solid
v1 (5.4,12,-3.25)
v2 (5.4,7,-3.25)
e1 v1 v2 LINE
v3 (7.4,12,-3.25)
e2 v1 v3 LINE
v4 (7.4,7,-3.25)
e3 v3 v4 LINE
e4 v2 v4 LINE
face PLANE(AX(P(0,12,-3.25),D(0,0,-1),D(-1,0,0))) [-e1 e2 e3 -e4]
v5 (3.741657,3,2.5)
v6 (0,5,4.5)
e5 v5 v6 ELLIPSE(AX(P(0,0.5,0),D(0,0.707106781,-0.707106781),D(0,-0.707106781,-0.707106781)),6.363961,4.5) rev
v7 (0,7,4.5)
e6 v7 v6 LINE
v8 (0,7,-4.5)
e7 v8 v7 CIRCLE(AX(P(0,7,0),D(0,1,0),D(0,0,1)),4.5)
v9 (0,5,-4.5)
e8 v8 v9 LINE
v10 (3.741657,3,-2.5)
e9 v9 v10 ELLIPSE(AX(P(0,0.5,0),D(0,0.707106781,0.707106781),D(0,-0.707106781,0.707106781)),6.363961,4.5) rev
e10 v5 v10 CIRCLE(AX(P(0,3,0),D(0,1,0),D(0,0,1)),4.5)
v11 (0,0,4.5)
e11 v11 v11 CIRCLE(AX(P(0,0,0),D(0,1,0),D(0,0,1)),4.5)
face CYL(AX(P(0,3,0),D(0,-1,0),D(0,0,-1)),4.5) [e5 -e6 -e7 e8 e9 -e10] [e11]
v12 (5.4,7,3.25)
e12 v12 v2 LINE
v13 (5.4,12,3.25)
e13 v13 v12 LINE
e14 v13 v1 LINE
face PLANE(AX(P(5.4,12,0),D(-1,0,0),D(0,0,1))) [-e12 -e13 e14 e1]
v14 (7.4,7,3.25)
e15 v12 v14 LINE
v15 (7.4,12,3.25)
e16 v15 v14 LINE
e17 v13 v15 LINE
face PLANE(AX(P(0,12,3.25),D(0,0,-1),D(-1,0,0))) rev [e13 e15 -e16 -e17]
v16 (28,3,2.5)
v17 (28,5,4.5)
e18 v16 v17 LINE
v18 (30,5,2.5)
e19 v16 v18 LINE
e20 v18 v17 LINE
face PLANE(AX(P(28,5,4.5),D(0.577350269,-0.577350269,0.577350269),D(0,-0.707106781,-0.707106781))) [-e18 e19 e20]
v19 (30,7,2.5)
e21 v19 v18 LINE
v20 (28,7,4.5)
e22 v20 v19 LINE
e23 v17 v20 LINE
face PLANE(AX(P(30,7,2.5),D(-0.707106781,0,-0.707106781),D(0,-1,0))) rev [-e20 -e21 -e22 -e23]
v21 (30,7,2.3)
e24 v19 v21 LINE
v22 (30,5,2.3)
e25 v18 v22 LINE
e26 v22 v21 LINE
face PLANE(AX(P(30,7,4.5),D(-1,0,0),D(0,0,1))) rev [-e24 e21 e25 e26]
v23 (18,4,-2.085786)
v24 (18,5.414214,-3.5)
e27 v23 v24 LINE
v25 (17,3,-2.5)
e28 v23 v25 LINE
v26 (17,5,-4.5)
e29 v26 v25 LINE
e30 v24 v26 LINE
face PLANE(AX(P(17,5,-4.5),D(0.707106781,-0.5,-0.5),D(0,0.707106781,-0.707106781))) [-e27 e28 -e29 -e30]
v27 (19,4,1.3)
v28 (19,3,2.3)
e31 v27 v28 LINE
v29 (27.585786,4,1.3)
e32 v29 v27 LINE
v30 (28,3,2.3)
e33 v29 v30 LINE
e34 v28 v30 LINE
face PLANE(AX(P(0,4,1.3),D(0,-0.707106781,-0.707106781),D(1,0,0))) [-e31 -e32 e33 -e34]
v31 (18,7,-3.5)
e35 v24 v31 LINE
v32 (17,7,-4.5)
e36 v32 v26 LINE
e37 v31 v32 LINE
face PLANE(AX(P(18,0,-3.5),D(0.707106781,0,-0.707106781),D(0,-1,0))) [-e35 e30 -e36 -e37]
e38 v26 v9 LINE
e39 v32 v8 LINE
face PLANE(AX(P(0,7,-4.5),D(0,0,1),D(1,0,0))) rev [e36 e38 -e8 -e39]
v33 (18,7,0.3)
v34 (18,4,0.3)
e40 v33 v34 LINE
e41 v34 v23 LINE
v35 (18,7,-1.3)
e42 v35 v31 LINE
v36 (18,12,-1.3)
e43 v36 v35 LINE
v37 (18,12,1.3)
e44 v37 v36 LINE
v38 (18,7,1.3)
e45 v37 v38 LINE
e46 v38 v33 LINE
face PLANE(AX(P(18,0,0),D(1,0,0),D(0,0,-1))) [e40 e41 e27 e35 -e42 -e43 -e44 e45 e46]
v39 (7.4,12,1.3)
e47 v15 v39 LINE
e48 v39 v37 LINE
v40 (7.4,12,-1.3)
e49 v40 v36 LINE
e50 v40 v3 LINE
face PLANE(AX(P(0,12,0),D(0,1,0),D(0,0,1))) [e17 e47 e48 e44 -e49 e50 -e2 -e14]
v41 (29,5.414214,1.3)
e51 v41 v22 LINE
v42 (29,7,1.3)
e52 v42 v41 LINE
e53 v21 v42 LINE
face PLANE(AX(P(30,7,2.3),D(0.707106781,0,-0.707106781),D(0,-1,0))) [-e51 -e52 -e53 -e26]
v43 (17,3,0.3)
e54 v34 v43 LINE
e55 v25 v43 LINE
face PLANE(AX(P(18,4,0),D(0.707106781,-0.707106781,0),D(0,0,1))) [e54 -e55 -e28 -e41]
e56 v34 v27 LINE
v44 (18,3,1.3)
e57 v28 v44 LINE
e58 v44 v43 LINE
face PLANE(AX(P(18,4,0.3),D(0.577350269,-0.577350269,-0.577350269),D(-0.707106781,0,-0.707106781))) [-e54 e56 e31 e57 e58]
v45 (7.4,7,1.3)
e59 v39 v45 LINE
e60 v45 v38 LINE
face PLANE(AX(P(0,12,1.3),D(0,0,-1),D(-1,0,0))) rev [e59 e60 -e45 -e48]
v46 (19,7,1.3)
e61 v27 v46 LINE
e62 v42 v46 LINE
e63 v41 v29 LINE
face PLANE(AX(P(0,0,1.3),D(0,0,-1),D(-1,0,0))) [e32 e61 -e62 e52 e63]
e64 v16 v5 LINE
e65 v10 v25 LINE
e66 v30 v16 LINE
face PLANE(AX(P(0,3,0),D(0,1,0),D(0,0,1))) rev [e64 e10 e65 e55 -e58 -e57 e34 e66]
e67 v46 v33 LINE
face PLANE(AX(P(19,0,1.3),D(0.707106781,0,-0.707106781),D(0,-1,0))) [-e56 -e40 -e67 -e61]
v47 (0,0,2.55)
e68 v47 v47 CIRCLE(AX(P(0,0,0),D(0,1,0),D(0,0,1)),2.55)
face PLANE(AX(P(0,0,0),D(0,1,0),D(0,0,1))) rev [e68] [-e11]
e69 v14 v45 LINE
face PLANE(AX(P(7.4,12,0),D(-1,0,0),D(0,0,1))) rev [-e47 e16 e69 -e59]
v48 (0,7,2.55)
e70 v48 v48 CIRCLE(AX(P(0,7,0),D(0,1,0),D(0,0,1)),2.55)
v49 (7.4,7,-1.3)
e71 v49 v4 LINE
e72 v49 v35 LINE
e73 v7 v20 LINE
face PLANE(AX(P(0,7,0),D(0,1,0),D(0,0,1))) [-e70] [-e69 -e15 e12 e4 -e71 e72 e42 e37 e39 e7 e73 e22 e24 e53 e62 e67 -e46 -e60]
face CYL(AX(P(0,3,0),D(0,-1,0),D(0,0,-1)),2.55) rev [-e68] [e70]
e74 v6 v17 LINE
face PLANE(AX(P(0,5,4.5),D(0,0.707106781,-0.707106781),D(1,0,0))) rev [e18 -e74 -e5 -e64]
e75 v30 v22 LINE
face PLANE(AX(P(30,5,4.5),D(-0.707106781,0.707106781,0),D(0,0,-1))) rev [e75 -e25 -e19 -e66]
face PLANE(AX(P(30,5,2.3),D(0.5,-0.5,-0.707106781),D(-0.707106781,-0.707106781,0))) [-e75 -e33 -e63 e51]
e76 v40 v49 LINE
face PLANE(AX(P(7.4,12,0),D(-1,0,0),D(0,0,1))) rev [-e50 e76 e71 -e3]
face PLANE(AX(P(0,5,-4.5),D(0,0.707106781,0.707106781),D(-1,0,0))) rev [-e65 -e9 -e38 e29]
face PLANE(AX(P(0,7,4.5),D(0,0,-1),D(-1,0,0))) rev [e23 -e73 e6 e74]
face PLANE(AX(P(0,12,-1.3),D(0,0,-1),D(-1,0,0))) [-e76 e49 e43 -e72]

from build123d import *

# Parameters (mm, degrees)
SKETCH1_R           = 4.5
SKETCH1_R_2         = 2.55
BOSS_EXTRUDE1_DEPTH = 3
SKETCH2_R           = 2.55
BOSS_EXTRUDE2_DEPTH = 4
CHAMFER1_SIZE       = 2
CUT_EXTRUDE1_DEPTH  = 32.132780152
BOSS_EXTRUDE4_DEPTH = 5
CHAMFER2_SIZE       = 1


with BuildPart() as part:
    # Sketch1 → Boss-Extrude1 (new body)
    with BuildSketch(Plane(origin=(0, 0, 0), x_dir=(1, 0, 0), z_dir=(0, 1, 0))):
        with Locations(Location((0, 0, 0), (0, 0, 270))):
            Circle(SKETCH1_R)
        with Locations(Location((0, 0, 0), (0, 0, 270))):
            Circle(SKETCH1_R_2, mode=Mode.SUBTRACT)
    extrude(amount=BOSS_EXTRUDE1_DEPTH)

    # Sketch2 → Boss-Extrude2 (add)
    with BuildSketch(Plane(origin=(0, 3, 0), x_dir=(1, 0, 0), z_dir=(0, 1, 0))):
        with BuildLine():
            Line((0, -4.5), (30, -4.5))
            Line((30, -4.5), (30, 4.5))
            Line((30, 4.5), (0, 4.5))
            ThreePointArc((0, 4.5), (-4.5, 0), (0, -4.5))
        make_face()
        with Locations(Location((0, 0, 0), (0, 0, 270))):
            Circle(SKETCH2_R, mode=Mode.SUBTRACT)
    extrude(amount=BOSS_EXTRUDE2_DEPTH)

    # Chamfer1
    # the kernel refuses this chamfer: 2 mm, written as the material it takes off along each edge
    with BuildSketch(Plane(origin=(28.666666667, 4.333333333, 3.166666667), x_dir=(-0.7071067811865475, -0.7071067811865475, 0), z_dir=(0.5773502691896256, -0.5773502691896258, 0.5773502691896258))) as chamfer1_piece_1:
        Polygon((-1.414213562, 0.816496581), (1.414213562, 0.816496581), (0, -1.632993162), align=None)
    extrude(amount=2.540341184, mode=Mode.SUBTRACT)
    with BuildSketch(Plane(origin=(28.666666667, 4.333333333, -3.166666667), x_dir=(-0.7071067811865476, -0.7071067811865475, 0), z_dir=(0.5773502691896256, -0.5773502691896258, -0.5773502691896257))) as chamfer1_piece_2:
        Polygon((-1.414213562, -0.816496581), (1.414213562, -0.816496581), (0, 1.632993162), align=None)
    extrude(amount=2.540341184, mode=Mode.SUBTRACT)
    with BuildSketch(Plane(origin=(-5.143365976, 3, 4.5), x_dir=(0, -0.027495876610586275, -0.9996219169112968), z_dir=(1, 0, 0))) as chamfer1_piece_3_section:
        Polygon((CHAMFER1_SIZE * 0.999621916911, CHAMFER1_SIZE * 0.0274958766106), (-CHAMFER1_SIZE * 0.0274958766106, CHAMFER1_SIZE * 0.999621916911), (0, 0), align=None)
    chamfer1_piece_3 = extrude(amount=40.286731952, mode=Mode.PRIVATE)
    chamfer1_piece_3 = chamfer1_piece_3 - Plane(origin=(0, 3.673505516, 0), x_dir=(0, 0, 1), z_dir=(0, -1, 0)) * Cylinder(4.5, 89, mode=Mode.PRIVATE)
    add(chamfer1_piece_3, mode=Mode.SUBTRACT)
    with BuildSketch(Plane(origin=(30, 3, 9.643365976), x_dir=(-0.9996219169112968, -0.027495876610586296, 0), z_dir=(0, 0, -1))) as chamfer1_piece_4:
        Polygon((CHAMFER1_SIZE * 0.999621916911, CHAMFER1_SIZE * 0.0274958766106), (-CHAMFER1_SIZE * 0.0274958766106, CHAMFER1_SIZE * 0.999621916911), (0, 0), align=None)
    extrude(amount=19.286731952, mode=Mode.SUBTRACT)
    with BuildSketch(Plane(origin=(30, -2.143365976, 4.5), x_dir=(-0.9996219169112968, 0, 0.02749587661058651), z_dir=(0, 1, 0))) as chamfer1_piece_5:
        Polygon((CHAMFER1_SIZE * 0.999621916911, -CHAMFER1_SIZE * 0.0274958766106), (-CHAMFER1_SIZE * 0.0274958766106, -CHAMFER1_SIZE * 0.999621916911), (0, 0), align=None)
    extrude(amount=14.286731952, mode=Mode.SUBTRACT)
    with BuildSketch(Plane(origin=(35.143365976, 3, -4.5), x_dir=(0, -0.027495876610586275, 0.9996219169112968), z_dir=(-1, 0, 0))) as chamfer1_piece_6_section:
        Polygon((CHAMFER1_SIZE * 0.999621916911, CHAMFER1_SIZE * 0.0274958766106), (-CHAMFER1_SIZE * 0.0274958766106, CHAMFER1_SIZE * 0.999621916911), (0, 0), align=None)
    chamfer1_piece_6 = extrude(amount=40.286731952, mode=Mode.PRIVATE)
    chamfer1_piece_6 = chamfer1_piece_6 - Plane(origin=(0, 3.673505518, 0), x_dir=(0, 0, 1), z_dir=(0, -1, 0)) * Cylinder(4.5, 89, mode=Mode.PRIVATE)
    add(chamfer1_piece_6, mode=Mode.SUBTRACT)
    with BuildSketch(Plane(origin=(30, -2.143365976, -4.5), x_dir=(-0.9996219169112968, 0, -0.02749587661058651), z_dir=(0, 1, 0))) as chamfer1_piece_7:
        Polygon((CHAMFER1_SIZE * 0.999621916911, CHAMFER1_SIZE * 0.0274958766106), (-CHAMFER1_SIZE * 0.0274958766106, CHAMFER1_SIZE * 0.999621916911), (0, 0), align=None)
    extrude(amount=14.286731952, mode=Mode.SUBTRACT)

    # Sketch3 → Cut-Extrude1 (cut, through all)
    with BuildSketch(Plane(origin=(0, 7, 0), x_dir=(1, 0, 0), z_dir=(0, 1, 0))):
        Polygon((18, 1.3), (18, -1.3), (30, -1.3), (30, 2.5), (28, 4.5), (18, 4.5), align=None)
    extrude(amount=-CUT_EXTRUDE1_DEPTH, mode=Mode.SUBTRACT)

    # Sketch3<4> → Boss-Extrude4 (add)
    with BuildSketch(Plane(origin=(0, 7, 0), x_dir=(1, 0, 0), z_dir=(0, 1, 0))):
        Polygon((5.4, 3.25), (5.4, -3.25), (7.4, -3.25), (7.4, -1.3), (18, -1.3), (18, 1.3), (7.4, 1.3), (7.4, 3.25), align=None)
    extrude(amount=BOSS_EXTRUDE4_DEPTH)

    # Chamfer2
    chamfer2_edges = [part.edges().sort_by_distance(p)[0] for p in [
        (29, 4, 1.3),
        (18, 4, -3.5),
        (18, 5, 1.3),
        (30, 6, 1.3),
        (23, 3, 1.3),
        (18, 3, -0.6),
        (18, 6, -4.5),
    ]]
    chamfer(chamfer2_edges, length=CHAMFER2_SIZE)


solid = part.part
